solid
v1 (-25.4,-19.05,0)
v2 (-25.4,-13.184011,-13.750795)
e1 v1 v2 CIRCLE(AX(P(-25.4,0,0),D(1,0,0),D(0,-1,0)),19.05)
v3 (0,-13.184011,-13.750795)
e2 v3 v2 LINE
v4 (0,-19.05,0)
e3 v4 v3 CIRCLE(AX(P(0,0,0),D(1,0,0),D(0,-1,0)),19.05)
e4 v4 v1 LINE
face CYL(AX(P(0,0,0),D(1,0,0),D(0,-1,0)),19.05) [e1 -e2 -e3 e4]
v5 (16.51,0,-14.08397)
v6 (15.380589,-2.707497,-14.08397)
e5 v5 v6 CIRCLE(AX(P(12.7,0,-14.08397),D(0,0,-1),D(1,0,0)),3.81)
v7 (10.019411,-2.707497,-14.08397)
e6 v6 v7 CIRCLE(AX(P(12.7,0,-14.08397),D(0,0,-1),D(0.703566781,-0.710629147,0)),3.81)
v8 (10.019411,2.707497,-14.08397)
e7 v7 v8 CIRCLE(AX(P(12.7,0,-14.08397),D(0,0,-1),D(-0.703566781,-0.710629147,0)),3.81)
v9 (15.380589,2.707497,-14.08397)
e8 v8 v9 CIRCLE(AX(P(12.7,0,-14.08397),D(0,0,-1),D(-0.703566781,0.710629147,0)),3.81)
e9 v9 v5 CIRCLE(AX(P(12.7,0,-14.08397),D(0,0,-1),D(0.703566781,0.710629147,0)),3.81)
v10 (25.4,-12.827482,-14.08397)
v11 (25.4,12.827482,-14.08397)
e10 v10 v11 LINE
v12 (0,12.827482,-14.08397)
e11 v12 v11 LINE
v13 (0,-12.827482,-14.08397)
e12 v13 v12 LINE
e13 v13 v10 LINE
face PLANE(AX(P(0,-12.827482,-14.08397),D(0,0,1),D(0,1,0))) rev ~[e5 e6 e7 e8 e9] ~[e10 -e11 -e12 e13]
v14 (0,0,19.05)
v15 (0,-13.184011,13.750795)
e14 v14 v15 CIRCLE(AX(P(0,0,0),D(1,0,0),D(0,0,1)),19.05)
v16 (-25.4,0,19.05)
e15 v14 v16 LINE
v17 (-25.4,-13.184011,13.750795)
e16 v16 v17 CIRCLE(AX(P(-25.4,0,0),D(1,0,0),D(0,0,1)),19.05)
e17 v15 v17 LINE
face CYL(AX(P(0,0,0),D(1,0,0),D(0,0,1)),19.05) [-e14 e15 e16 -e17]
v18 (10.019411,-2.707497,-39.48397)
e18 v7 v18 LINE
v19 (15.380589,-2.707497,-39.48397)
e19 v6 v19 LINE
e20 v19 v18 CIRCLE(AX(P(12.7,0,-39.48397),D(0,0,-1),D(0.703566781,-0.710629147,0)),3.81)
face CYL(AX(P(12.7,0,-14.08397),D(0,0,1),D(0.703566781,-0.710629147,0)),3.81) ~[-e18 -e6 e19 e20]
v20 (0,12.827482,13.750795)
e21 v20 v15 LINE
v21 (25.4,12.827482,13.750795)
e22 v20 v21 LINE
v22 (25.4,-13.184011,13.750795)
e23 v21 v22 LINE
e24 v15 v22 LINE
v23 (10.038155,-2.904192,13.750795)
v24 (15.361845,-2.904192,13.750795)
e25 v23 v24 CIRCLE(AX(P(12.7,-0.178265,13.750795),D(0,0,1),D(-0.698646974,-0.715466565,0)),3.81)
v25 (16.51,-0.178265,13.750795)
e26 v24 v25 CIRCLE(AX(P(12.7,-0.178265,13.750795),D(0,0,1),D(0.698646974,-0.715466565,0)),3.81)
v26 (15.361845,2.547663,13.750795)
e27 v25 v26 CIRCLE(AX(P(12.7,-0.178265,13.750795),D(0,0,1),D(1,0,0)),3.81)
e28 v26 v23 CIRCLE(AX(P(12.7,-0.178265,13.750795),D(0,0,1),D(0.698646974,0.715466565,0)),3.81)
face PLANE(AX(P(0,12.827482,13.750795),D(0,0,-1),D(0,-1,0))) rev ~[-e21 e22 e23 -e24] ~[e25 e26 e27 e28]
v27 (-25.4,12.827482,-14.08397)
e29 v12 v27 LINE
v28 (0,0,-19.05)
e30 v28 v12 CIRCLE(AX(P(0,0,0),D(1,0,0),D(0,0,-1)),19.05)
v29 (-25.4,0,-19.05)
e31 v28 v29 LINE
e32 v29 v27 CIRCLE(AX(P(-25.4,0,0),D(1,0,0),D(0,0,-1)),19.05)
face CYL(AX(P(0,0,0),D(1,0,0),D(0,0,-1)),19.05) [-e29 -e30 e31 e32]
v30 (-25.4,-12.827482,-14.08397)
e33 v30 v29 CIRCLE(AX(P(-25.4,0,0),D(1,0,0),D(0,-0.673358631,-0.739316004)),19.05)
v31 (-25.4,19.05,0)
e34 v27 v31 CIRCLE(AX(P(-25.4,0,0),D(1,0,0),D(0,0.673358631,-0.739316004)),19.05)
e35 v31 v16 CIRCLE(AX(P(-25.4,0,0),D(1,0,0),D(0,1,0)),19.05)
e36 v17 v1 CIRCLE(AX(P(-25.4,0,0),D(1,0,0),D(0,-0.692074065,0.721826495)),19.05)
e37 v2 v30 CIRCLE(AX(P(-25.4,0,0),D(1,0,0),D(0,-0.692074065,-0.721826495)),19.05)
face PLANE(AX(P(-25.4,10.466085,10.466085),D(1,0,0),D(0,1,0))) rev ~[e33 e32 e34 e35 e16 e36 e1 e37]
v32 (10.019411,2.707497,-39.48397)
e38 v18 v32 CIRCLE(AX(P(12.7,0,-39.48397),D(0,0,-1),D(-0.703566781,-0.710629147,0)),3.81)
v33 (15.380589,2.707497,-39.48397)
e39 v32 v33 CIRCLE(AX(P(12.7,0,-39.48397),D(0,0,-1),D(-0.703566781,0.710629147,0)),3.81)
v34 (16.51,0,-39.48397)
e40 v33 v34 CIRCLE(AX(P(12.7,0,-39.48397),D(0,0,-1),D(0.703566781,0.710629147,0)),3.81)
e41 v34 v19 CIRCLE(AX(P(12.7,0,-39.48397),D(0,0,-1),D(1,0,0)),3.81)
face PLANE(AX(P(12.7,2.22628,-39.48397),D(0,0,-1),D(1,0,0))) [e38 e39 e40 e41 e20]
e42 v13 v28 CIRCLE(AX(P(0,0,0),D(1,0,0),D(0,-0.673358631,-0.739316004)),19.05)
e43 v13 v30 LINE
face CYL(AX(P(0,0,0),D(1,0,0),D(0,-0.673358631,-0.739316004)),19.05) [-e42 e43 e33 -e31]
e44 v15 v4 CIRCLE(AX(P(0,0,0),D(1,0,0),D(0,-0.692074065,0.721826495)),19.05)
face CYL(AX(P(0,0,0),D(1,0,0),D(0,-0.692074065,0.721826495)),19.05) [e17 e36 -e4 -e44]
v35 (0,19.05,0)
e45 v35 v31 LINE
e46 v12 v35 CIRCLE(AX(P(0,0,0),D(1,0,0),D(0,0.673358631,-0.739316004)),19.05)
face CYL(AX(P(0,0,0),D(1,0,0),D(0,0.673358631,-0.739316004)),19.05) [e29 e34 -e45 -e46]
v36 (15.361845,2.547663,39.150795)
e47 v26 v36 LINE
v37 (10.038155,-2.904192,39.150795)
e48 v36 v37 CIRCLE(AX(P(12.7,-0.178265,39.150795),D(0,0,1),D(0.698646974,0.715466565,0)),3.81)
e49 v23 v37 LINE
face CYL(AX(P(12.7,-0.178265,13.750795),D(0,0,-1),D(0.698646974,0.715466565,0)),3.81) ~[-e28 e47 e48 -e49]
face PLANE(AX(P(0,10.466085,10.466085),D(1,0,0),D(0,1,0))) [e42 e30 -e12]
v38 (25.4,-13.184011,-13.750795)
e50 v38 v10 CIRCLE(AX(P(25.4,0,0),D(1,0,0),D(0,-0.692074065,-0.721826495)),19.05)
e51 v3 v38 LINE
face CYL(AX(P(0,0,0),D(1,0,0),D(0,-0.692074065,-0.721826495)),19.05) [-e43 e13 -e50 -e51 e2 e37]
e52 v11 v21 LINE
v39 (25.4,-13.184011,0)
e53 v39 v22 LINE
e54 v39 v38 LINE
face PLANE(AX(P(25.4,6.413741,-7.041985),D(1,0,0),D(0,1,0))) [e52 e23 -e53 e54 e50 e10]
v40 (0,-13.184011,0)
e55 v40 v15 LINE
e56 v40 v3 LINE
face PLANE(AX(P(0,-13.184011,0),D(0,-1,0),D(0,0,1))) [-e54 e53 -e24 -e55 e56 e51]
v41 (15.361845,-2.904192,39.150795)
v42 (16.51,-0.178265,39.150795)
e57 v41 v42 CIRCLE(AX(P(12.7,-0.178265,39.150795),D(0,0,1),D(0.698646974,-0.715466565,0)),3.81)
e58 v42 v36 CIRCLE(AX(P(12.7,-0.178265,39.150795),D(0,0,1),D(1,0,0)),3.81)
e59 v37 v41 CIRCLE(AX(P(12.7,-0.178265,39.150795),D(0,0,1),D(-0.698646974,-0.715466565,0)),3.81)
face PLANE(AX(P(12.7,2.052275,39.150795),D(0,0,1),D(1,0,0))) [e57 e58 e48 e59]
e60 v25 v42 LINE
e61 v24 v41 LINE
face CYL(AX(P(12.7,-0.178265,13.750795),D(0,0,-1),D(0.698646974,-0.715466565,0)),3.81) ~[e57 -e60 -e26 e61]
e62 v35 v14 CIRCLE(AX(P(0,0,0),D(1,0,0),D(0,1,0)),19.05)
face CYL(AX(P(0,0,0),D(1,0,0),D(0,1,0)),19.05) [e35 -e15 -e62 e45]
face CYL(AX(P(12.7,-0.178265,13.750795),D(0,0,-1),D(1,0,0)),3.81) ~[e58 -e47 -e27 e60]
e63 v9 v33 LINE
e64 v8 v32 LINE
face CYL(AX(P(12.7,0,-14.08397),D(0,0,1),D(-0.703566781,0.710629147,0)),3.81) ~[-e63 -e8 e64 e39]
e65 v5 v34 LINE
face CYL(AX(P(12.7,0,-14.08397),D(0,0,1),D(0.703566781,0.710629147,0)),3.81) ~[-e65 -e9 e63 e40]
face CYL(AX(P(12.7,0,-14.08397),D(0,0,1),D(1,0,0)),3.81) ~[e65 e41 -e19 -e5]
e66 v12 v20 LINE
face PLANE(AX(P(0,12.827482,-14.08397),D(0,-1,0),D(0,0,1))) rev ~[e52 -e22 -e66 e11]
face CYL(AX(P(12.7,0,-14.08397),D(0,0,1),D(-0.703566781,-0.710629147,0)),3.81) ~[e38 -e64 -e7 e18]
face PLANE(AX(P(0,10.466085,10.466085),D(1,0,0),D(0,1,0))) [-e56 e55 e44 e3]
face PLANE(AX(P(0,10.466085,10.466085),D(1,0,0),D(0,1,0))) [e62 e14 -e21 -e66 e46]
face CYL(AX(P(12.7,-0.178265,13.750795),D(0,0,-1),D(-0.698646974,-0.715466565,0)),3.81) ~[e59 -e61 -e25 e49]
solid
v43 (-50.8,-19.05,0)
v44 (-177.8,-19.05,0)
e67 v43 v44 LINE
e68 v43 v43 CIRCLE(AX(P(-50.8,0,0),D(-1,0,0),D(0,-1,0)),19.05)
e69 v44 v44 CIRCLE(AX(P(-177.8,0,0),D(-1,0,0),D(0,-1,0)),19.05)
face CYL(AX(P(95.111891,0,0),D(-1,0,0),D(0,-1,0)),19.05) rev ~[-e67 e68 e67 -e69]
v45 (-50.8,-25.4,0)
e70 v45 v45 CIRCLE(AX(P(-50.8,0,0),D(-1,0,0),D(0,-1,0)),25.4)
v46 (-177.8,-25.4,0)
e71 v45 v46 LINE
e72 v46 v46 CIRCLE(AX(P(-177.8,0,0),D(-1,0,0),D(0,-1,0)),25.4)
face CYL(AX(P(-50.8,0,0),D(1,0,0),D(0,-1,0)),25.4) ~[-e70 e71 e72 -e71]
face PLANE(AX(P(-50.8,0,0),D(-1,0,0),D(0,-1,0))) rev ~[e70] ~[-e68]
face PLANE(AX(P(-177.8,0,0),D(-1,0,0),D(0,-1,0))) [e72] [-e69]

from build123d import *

# Parameters (mm, degrees)
F0_W     = 12.8274819265
F0_H     = 14.0839698744
F0_H_2   = 13.7507947324
F0_W_2   = 13.1840109309
F1_DEPTH = 25.4
F2_DEPTH = 25.4
F5_DEPTH = 25.4
F6_DEPTH = 25.4
F8_R     = 25.4
F9_DEPTH = 127
F11_D    = 38.1


with BuildPart() as f1:
    # F0 (on Right) → F1 (new body)
    with BuildSketch(Plane.YZ):
        with Locations((6.4137409633, -7.0419849372)):
            Rectangle(F0_W, F0_H)
        with Locations((6.4137409633, 6.8753973662)):
            Rectangle(F0_W, F0_H_2)
        with Locations((-6.5920054655, 6.8753973662)):
            Rectangle(F0_W_2, F0_H_2)
        with BuildLine():
            Line((-12.8274819265, -14.0839698744), (0, -14.0839698744))
            Line((0, -14.0839698744), (0, 0))
            Line((0, 0), (-13.1840109309, 0))
            Line((-13.1840109309, 0), (-13.1840109309, -13.7507947324))
            ThreePointArc((-13.1840109309, -13.7507947324), (-13.0068132756, -13.9185239308), (-12.8274819265, -14.0839698744))
        make_face()
    extrude(amount=F1_DEPTH)

    # F0 (on Right) → F2 (join)
    with BuildSketch(Plane.YZ):
        with BuildLine():
            Line((12.8274819265, 0), (19.05, 0))
            ThreePointArc((19.05, 0), (13.4703841816, 13.4703841816), (0, 19.05))
            Line((0, 19.05), (0, 13.7507947324))
            Line((0, 13.7507947324), (12.8274819265, 13.7507947324))
            Line((12.8274819265, 13.7507947324), (12.8274819265, 0))
        make_face()
        with BuildLine():
            ThreePointArc((12.8274819265, -14.0839698744), (17.4250685895, -7.6986677191), (19.05, 0))
            Line((19.05, 0), (12.8274819265, 0))
            Line((12.8274819265, 0), (12.8274819265, -14.0839698744))
        make_face()
        with BuildLine():
            Line((0, 13.7507947324), (0, 19.05))
            ThreePointArc((0, 19.05), (-7.104571076, 17.6756207763), (-13.1840109309, 13.7507947324))
            Line((-13.1840109309, 13.7507947324), (0, 13.7507947324))
        make_face()
        with BuildLine():
            ThreePointArc((0, -19.05), (6.877604012, -17.7651643126), (12.8274819265, -14.0839698744))
            Line((12.8274819265, -14.0839698744), (0, -14.0839698744))
            Line((0, -14.0839698744), (0, -19.05))
        make_face()
        with Locations((6.4137409633, -7.0419849372)):
            Rectangle(F0_W, F0_H)
        with Locations((6.4137409633, 6.8753973662)):
            Rectangle(F0_W, F0_H_2)
        with BuildLine():
            Line((-13.1840109309, 0), (-13.1840109309, 13.7507947324))
            ThreePointArc((-13.1840109309, 13.7507947324), (-17.5222416978, 7.4748609273), (-19.05, 0))
            Line((-19.05, 0), (-13.1840109309, 0))
        make_face()
        with Locations((-6.5920054655, 6.8753973662)):
            Rectangle(F0_W_2, F0_H_2)
        with BuildLine():
            ThreePointArc((-12.8274819265, -14.0839698744), (-6.877604012, -17.7651643126), (0, -19.05))
            Line((0, -19.05), (0, -14.0839698744))
            Line((0, -14.0839698744), (-12.8274819265, -14.0839698744))
        make_face()
        with BuildLine():
            Line((-12.8274819265, -14.0839698744), (0, -14.0839698744))
            Line((0, -14.0839698744), (0, 0))
            Line((0, 0), (-13.1840109309, 0))
            Line((-13.1840109309, 0), (-13.1840109309, -13.7507947324))
            ThreePointArc((-13.1840109309, -13.7507947324), (-13.0068132756, -13.9185239308), (-12.8274819265, -14.0839698744))
        make_face()
        with BuildLine():
            Line((-13.1840109309, 0), (-19.05, 0))
            ThreePointArc((-19.05, 0), (-17.5222416978, -7.4748609273), (-13.1840109309, -13.7507947324))
            Line((-13.1840109309, -13.7507947324), (-13.1840109309, 0))
        make_face()
    extrude(amount=-F2_DEPTH)

    # F3 (on face) → F5 (join)
    with BuildSketch(Plane.XY.offset(13.7507947324)):
        with BuildLine():
            ThreePointArc((15.3618449693, 2.5476631123), (12.7, 3.6317354978), (10.0381550307, 2.5476631123))
            Line((10.0381550307, 2.5476631123), (12.7, -0.1782645022))
            Line((12.7, -0.1782645022), (15.3618449693, 2.5476631123))
        make_face()
        with BuildLine():
            Line((12.7, -0.1782645022), (10.0381550307, 2.5476631123))
            ThreePointArc((10.0381550307, 2.5476631123), (8.89, -0.1782645022), (10.0381550307, -2.9041921166))
            Line((10.0381550307, -2.9041921166), (12.7, -0.1782645022))
        make_face()
        with BuildLine():
            Line((15.3618449693, -2.9041921166), (12.7, -0.1782645022))
            Line((12.7, -0.1782645022), (10.0381550307, -2.9041921166))
            ThreePointArc((10.0381550307, -2.9041921166), (12.7, -3.9882645022), (15.3618449693, -2.9041921166))
        make_face()
        with BuildLine():
            Line((15.3618449693, 2.5476631123), (12.7, -0.1782645022))
            Line((12.7, -0.1782645022), (15.3618449693, -2.9041921166))
            ThreePointArc((15.3618449693, -2.9041921166), (16.211248306, -1.6571949716), (16.51, -0.1782645022))
            ThreePointArc((16.51, -0.1782645022), (16.211248306, 1.3006659673), (15.3618449693, 2.5476631123))
        make_face()
    extrude(amount=F5_DEPTH)

    # F4 (on face) → F6 (join)
    with BuildSketch(Plane(origin=(0, 0, -14.0839698744), x_dir=(1, 0, 0), z_dir=(0, 0, -1))):
        with BuildLine():
            ThreePointArc((10.0194105643, -2.7074970503), (12.7, -3.81), (15.3805894357, -2.7074970503))
            Line((15.3805894357, -2.7074970503), (12.7, 0))
            Line((12.7, 0), (10.0194105643, -2.7074970503))
        make_face()
        with BuildLine():
            Line((12.7, 0), (15.3805894357, -2.7074970503))
            ThreePointArc((15.3805894357, -2.7074970503), (16.2163294605, -1.4668084827), (16.51, 0))
            ThreePointArc((16.51, 0), (16.2163294605, 1.4668084827), (15.3805894357, 2.7074970503))
            Line((15.3805894357, 2.7074970503), (12.7, 0))
        make_face()
        with BuildLine():
            Line((10.0194105643, 2.7074970503), (12.7, 0))
            Line((12.7, 0), (15.3805894357, 2.7074970503))
            ThreePointArc((15.3805894357, 2.7074970503), (12.7, 3.81), (10.0194105643, 2.7074970503))
        make_face()
        with BuildLine():
            Line((10.0194105643, -2.7074970503), (12.7, 0))
            Line((12.7, 0), (10.0194105643, 2.7074970503))
            ThreePointArc((10.0194105643, 2.7074970503), (8.89, 0), (10.0194105643, -2.7074970503))
        make_face()
    extrude(amount=F6_DEPTH)


with BuildPart() as f9:
    # F8 (on offset) → F9 (new body)
    with BuildSketch(Plane(origin=(-50.8, 0, 0), x_dir=(0, -1, 0), z_dir=(-1, 0, 0))):
        Circle(F8_R)
    extrude(amount=F9_DEPTH)

    # F11 (through all)
    with Locations(Plane.YZ.offset(-50.8)):
        with Locations((0, 0)):
            Hole(F11_D / 2)


solid = Compound([f1.part, f9.part])
